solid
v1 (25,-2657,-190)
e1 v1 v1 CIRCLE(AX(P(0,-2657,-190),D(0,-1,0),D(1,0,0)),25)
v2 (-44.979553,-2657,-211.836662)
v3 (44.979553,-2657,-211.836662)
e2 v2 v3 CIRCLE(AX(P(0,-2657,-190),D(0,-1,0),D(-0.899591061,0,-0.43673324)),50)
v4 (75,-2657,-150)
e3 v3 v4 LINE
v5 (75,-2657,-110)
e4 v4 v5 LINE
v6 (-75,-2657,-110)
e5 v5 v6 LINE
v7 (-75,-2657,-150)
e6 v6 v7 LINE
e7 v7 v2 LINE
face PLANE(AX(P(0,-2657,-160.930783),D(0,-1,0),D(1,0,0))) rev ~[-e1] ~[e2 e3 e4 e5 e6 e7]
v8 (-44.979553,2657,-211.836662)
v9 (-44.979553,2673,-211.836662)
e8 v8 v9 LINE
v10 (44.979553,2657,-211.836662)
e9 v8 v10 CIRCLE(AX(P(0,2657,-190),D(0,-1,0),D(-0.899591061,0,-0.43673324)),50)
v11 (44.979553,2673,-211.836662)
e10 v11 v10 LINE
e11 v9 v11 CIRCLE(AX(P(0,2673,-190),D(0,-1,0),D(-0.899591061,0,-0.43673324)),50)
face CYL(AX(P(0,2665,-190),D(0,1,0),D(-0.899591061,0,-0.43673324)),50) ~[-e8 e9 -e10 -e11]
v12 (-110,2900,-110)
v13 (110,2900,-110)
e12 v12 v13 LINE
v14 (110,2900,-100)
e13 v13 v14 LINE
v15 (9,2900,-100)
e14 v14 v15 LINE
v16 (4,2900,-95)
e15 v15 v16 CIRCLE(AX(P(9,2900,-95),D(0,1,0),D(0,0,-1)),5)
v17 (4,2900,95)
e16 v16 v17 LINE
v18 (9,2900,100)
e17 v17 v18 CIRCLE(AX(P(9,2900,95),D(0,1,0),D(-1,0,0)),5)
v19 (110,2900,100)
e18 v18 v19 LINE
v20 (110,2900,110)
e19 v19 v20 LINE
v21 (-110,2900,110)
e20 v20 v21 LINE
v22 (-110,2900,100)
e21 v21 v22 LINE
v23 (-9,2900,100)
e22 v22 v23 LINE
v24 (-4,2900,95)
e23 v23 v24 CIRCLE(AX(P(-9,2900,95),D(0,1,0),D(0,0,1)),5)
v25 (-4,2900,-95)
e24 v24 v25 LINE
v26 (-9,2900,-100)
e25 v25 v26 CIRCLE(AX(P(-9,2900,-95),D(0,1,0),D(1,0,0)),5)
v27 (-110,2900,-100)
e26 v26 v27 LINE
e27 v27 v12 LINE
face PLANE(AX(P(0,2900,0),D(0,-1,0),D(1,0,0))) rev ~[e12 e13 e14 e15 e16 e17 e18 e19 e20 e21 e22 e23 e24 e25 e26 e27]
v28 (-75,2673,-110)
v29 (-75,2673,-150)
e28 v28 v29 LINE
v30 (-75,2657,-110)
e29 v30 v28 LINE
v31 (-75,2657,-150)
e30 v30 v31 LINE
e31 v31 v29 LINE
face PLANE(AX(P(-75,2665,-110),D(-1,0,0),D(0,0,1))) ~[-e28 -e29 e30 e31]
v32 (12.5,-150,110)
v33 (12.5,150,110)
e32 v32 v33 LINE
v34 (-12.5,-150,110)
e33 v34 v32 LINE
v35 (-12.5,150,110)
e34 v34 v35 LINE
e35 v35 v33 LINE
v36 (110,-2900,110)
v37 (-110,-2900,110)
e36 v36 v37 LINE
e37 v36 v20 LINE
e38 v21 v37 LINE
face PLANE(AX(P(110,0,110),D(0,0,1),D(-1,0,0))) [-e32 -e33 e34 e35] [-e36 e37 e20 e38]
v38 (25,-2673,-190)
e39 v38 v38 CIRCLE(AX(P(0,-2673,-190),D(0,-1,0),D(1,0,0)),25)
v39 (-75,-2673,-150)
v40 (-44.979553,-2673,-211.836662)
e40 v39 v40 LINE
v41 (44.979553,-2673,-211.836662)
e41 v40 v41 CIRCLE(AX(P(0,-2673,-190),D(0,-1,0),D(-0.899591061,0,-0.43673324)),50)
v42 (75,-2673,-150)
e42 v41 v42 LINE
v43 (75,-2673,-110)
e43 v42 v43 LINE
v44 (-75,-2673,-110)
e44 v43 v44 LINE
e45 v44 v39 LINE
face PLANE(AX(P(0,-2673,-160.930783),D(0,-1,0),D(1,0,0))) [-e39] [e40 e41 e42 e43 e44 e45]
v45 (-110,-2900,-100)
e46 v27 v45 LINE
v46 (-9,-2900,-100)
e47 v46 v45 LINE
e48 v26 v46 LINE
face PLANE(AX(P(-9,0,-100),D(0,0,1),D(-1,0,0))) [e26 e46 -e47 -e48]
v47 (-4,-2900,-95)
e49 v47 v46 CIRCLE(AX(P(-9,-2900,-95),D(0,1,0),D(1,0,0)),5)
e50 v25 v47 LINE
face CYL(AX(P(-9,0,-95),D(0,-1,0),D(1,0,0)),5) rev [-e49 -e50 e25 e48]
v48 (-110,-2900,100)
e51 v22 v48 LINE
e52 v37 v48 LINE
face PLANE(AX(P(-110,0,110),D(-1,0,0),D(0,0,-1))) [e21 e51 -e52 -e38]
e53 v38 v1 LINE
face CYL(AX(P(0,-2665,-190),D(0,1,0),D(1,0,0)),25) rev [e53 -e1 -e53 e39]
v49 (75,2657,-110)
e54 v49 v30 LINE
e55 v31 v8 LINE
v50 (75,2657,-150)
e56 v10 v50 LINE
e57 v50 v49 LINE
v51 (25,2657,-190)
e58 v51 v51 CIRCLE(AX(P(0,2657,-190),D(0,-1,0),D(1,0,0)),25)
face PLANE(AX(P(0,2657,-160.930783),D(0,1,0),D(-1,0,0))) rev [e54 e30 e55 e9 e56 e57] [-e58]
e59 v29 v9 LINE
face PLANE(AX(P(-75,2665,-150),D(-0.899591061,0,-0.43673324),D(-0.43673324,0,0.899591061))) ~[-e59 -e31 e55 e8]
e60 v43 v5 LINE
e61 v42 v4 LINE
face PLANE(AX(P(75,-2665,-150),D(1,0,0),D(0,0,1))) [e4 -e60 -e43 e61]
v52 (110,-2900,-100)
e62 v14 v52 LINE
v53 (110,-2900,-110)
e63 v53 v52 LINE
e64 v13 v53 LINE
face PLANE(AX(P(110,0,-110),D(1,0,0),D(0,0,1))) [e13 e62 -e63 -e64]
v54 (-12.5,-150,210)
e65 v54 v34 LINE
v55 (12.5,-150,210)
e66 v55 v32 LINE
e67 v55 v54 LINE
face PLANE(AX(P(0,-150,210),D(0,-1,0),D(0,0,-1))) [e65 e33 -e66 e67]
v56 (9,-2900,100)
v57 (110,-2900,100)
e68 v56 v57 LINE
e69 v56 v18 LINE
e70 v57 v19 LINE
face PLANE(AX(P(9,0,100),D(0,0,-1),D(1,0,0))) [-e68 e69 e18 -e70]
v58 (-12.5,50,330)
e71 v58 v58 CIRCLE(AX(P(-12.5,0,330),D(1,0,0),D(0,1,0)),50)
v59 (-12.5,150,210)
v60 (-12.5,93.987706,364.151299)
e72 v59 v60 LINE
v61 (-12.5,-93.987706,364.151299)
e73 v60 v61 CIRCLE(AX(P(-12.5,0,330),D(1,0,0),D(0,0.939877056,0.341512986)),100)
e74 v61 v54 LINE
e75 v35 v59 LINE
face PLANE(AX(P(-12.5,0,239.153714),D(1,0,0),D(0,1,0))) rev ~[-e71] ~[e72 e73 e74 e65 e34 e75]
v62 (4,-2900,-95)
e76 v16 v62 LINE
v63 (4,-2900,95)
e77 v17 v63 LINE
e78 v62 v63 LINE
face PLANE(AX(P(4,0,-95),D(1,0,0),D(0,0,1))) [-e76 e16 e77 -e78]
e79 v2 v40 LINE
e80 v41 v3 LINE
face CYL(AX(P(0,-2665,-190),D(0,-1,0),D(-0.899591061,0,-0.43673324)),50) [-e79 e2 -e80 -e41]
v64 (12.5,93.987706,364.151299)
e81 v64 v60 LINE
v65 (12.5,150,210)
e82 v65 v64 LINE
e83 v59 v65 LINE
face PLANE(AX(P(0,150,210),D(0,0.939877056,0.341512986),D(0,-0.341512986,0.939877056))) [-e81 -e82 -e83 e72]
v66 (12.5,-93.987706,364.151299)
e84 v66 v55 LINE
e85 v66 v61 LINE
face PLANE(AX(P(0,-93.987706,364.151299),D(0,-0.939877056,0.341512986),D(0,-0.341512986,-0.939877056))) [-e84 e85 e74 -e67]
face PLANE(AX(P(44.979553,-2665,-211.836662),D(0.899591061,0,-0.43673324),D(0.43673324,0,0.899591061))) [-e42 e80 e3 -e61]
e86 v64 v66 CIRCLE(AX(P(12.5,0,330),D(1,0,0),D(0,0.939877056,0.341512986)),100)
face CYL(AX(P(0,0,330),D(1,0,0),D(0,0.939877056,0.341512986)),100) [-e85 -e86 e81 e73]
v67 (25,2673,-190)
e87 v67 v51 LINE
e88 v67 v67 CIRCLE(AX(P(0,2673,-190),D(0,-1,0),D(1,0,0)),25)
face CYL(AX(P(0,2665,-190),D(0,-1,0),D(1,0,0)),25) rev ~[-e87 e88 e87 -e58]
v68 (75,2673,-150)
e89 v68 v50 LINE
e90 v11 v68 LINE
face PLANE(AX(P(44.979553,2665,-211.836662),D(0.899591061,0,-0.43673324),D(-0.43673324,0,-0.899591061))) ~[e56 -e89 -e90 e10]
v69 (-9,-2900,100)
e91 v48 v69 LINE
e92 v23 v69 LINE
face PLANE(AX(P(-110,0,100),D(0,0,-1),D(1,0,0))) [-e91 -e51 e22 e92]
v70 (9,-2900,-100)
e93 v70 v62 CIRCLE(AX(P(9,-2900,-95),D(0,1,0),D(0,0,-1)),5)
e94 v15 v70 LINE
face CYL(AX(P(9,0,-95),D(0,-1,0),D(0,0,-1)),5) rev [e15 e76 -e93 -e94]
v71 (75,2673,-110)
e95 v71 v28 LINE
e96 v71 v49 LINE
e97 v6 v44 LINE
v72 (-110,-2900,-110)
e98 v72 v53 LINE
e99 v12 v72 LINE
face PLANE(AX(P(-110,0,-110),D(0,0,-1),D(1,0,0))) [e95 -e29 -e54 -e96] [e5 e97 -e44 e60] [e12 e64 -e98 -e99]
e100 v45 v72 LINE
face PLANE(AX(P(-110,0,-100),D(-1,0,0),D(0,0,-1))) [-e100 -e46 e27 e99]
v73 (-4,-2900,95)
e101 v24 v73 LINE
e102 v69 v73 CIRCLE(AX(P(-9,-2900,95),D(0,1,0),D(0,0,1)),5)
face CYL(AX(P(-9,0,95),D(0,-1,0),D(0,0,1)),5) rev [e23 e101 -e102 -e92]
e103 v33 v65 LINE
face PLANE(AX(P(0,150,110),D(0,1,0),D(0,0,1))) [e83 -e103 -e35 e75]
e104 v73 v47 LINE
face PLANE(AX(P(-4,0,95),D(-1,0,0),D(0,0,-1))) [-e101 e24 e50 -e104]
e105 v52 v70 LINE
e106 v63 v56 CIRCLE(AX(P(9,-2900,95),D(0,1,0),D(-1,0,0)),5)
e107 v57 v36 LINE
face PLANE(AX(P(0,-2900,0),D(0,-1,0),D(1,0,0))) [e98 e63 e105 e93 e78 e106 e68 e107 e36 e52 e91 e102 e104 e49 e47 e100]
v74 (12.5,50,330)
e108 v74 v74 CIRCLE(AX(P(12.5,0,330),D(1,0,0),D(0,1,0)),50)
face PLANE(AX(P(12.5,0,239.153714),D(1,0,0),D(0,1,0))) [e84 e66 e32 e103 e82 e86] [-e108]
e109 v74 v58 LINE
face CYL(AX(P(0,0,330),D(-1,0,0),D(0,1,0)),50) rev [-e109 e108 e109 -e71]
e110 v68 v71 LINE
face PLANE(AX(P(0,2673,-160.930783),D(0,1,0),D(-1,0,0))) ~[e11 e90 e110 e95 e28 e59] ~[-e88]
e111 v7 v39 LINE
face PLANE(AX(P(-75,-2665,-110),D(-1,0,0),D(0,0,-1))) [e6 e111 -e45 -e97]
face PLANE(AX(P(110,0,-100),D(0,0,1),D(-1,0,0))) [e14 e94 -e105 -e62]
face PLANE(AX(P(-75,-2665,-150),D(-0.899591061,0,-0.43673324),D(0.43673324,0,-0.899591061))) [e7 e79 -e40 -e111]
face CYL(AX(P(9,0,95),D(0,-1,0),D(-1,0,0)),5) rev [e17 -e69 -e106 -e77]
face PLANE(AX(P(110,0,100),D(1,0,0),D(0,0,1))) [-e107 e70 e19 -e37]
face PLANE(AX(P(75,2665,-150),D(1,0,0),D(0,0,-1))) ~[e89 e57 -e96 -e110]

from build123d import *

# Parameters (mm, degrees)
F1_DEPTH = 2900
F2_R     = 50
F3_DEPTH = 12.5
F5_R     = 25
F6_DEPTH = 8


# Not quite as in the source:
# - a pattern or mirror of a feature is missing from the dataset's text; its kind, count and spacing are read off the source's solid


with BuildPart() as f1:
    # F0 (on Front) → F1 (new body, symmetric)
    with BuildSketch(Plane.XZ):
        with BuildLine():
            Line((110, 110), (0, 110))
            Line((0, 110), (-110, 110))
            Line((-110, 110), (-110, 100))
            Line((-110, 100), (-9, 100))
            ThreePointArc((-9, 100), (-5.4644660941, 98.5355339059), (-4, 95))
            Line((-4, 95), (-4, 0))
            Line((-4, 0), (-4, -95))
            ThreePointArc((-4, -95), (-5.4644660941, -98.5355339059), (-9, -100))
            Line((-9, -100), (-110, -100))
            Line((-110, -100), (-110, -110))
            Line((-110, -110), (0, -110))
            Line((0, -110), (110, -110))
            Line((110, -110), (110, -100))
            Line((110, -100), (9, -100))
            ThreePointArc((9, -100), (5.4644660941, -98.5355339059), (4, -95))
            Line((4, -95), (4, 0))
            Line((4, 0), (4, 95))
            ThreePointArc((4, 95), (5.4644660941, 98.5355339059), (9, 100))
            Line((9, 100), (110, 100))
            Line((110, 100), (110, 110))
        make_face()
    extrude(amount=F1_DEPTH, both=True)

    # F2 (on Right) → F3 (join, symmetric)
    with BuildSketch(Plane.YZ):
        with BuildLine():
            Line((-150, 210), (-150, 110))
            Line((-150, 110), (150, 110))
            Line((150, 110), (150, 210))
            Line((150, 210), (93.9877055833, 364.1512986458))
            ThreePointArc((93.9877055833, 364.1512986458), (0, 430), (-93.9877055833, 364.1512986458))
            Line((-93.9877055833, 364.1512986458), (-150, 210))
        make_face()
        with Locations((0, 330)):
            Circle(F2_R, mode=Mode.SUBTRACT)
    extrude(amount=F3_DEPTH, both=True)

    # F5 (on offset) → F6 (join, symmetric)
    with BuildSketch(Plane.XZ.offset(2665)):
        with BuildLine():
            Line((75, -110), (-75, -110))
            Line((-75, -110), (-75, -150))
            Line((-75, -150), (-44.9795530586, -211.836661985))
            ThreePointArc((-44.9795530586, -211.836661985), (0, -240), (44.9795530586, -211.836661985))
            Line((44.9795530586, -211.836661985), (75, -150))
            Line((75, -150), (75, -110))
        make_face()
        with Locations((0, -190)):
            Circle(F5_R, mode=Mode.SUBTRACT)
    f6 = extrude(amount=F6_DEPTH, both=True)

    # F6_copies: F6 across plane
    add(f6.mirror(Plane.ZX))


solid = f1.part
